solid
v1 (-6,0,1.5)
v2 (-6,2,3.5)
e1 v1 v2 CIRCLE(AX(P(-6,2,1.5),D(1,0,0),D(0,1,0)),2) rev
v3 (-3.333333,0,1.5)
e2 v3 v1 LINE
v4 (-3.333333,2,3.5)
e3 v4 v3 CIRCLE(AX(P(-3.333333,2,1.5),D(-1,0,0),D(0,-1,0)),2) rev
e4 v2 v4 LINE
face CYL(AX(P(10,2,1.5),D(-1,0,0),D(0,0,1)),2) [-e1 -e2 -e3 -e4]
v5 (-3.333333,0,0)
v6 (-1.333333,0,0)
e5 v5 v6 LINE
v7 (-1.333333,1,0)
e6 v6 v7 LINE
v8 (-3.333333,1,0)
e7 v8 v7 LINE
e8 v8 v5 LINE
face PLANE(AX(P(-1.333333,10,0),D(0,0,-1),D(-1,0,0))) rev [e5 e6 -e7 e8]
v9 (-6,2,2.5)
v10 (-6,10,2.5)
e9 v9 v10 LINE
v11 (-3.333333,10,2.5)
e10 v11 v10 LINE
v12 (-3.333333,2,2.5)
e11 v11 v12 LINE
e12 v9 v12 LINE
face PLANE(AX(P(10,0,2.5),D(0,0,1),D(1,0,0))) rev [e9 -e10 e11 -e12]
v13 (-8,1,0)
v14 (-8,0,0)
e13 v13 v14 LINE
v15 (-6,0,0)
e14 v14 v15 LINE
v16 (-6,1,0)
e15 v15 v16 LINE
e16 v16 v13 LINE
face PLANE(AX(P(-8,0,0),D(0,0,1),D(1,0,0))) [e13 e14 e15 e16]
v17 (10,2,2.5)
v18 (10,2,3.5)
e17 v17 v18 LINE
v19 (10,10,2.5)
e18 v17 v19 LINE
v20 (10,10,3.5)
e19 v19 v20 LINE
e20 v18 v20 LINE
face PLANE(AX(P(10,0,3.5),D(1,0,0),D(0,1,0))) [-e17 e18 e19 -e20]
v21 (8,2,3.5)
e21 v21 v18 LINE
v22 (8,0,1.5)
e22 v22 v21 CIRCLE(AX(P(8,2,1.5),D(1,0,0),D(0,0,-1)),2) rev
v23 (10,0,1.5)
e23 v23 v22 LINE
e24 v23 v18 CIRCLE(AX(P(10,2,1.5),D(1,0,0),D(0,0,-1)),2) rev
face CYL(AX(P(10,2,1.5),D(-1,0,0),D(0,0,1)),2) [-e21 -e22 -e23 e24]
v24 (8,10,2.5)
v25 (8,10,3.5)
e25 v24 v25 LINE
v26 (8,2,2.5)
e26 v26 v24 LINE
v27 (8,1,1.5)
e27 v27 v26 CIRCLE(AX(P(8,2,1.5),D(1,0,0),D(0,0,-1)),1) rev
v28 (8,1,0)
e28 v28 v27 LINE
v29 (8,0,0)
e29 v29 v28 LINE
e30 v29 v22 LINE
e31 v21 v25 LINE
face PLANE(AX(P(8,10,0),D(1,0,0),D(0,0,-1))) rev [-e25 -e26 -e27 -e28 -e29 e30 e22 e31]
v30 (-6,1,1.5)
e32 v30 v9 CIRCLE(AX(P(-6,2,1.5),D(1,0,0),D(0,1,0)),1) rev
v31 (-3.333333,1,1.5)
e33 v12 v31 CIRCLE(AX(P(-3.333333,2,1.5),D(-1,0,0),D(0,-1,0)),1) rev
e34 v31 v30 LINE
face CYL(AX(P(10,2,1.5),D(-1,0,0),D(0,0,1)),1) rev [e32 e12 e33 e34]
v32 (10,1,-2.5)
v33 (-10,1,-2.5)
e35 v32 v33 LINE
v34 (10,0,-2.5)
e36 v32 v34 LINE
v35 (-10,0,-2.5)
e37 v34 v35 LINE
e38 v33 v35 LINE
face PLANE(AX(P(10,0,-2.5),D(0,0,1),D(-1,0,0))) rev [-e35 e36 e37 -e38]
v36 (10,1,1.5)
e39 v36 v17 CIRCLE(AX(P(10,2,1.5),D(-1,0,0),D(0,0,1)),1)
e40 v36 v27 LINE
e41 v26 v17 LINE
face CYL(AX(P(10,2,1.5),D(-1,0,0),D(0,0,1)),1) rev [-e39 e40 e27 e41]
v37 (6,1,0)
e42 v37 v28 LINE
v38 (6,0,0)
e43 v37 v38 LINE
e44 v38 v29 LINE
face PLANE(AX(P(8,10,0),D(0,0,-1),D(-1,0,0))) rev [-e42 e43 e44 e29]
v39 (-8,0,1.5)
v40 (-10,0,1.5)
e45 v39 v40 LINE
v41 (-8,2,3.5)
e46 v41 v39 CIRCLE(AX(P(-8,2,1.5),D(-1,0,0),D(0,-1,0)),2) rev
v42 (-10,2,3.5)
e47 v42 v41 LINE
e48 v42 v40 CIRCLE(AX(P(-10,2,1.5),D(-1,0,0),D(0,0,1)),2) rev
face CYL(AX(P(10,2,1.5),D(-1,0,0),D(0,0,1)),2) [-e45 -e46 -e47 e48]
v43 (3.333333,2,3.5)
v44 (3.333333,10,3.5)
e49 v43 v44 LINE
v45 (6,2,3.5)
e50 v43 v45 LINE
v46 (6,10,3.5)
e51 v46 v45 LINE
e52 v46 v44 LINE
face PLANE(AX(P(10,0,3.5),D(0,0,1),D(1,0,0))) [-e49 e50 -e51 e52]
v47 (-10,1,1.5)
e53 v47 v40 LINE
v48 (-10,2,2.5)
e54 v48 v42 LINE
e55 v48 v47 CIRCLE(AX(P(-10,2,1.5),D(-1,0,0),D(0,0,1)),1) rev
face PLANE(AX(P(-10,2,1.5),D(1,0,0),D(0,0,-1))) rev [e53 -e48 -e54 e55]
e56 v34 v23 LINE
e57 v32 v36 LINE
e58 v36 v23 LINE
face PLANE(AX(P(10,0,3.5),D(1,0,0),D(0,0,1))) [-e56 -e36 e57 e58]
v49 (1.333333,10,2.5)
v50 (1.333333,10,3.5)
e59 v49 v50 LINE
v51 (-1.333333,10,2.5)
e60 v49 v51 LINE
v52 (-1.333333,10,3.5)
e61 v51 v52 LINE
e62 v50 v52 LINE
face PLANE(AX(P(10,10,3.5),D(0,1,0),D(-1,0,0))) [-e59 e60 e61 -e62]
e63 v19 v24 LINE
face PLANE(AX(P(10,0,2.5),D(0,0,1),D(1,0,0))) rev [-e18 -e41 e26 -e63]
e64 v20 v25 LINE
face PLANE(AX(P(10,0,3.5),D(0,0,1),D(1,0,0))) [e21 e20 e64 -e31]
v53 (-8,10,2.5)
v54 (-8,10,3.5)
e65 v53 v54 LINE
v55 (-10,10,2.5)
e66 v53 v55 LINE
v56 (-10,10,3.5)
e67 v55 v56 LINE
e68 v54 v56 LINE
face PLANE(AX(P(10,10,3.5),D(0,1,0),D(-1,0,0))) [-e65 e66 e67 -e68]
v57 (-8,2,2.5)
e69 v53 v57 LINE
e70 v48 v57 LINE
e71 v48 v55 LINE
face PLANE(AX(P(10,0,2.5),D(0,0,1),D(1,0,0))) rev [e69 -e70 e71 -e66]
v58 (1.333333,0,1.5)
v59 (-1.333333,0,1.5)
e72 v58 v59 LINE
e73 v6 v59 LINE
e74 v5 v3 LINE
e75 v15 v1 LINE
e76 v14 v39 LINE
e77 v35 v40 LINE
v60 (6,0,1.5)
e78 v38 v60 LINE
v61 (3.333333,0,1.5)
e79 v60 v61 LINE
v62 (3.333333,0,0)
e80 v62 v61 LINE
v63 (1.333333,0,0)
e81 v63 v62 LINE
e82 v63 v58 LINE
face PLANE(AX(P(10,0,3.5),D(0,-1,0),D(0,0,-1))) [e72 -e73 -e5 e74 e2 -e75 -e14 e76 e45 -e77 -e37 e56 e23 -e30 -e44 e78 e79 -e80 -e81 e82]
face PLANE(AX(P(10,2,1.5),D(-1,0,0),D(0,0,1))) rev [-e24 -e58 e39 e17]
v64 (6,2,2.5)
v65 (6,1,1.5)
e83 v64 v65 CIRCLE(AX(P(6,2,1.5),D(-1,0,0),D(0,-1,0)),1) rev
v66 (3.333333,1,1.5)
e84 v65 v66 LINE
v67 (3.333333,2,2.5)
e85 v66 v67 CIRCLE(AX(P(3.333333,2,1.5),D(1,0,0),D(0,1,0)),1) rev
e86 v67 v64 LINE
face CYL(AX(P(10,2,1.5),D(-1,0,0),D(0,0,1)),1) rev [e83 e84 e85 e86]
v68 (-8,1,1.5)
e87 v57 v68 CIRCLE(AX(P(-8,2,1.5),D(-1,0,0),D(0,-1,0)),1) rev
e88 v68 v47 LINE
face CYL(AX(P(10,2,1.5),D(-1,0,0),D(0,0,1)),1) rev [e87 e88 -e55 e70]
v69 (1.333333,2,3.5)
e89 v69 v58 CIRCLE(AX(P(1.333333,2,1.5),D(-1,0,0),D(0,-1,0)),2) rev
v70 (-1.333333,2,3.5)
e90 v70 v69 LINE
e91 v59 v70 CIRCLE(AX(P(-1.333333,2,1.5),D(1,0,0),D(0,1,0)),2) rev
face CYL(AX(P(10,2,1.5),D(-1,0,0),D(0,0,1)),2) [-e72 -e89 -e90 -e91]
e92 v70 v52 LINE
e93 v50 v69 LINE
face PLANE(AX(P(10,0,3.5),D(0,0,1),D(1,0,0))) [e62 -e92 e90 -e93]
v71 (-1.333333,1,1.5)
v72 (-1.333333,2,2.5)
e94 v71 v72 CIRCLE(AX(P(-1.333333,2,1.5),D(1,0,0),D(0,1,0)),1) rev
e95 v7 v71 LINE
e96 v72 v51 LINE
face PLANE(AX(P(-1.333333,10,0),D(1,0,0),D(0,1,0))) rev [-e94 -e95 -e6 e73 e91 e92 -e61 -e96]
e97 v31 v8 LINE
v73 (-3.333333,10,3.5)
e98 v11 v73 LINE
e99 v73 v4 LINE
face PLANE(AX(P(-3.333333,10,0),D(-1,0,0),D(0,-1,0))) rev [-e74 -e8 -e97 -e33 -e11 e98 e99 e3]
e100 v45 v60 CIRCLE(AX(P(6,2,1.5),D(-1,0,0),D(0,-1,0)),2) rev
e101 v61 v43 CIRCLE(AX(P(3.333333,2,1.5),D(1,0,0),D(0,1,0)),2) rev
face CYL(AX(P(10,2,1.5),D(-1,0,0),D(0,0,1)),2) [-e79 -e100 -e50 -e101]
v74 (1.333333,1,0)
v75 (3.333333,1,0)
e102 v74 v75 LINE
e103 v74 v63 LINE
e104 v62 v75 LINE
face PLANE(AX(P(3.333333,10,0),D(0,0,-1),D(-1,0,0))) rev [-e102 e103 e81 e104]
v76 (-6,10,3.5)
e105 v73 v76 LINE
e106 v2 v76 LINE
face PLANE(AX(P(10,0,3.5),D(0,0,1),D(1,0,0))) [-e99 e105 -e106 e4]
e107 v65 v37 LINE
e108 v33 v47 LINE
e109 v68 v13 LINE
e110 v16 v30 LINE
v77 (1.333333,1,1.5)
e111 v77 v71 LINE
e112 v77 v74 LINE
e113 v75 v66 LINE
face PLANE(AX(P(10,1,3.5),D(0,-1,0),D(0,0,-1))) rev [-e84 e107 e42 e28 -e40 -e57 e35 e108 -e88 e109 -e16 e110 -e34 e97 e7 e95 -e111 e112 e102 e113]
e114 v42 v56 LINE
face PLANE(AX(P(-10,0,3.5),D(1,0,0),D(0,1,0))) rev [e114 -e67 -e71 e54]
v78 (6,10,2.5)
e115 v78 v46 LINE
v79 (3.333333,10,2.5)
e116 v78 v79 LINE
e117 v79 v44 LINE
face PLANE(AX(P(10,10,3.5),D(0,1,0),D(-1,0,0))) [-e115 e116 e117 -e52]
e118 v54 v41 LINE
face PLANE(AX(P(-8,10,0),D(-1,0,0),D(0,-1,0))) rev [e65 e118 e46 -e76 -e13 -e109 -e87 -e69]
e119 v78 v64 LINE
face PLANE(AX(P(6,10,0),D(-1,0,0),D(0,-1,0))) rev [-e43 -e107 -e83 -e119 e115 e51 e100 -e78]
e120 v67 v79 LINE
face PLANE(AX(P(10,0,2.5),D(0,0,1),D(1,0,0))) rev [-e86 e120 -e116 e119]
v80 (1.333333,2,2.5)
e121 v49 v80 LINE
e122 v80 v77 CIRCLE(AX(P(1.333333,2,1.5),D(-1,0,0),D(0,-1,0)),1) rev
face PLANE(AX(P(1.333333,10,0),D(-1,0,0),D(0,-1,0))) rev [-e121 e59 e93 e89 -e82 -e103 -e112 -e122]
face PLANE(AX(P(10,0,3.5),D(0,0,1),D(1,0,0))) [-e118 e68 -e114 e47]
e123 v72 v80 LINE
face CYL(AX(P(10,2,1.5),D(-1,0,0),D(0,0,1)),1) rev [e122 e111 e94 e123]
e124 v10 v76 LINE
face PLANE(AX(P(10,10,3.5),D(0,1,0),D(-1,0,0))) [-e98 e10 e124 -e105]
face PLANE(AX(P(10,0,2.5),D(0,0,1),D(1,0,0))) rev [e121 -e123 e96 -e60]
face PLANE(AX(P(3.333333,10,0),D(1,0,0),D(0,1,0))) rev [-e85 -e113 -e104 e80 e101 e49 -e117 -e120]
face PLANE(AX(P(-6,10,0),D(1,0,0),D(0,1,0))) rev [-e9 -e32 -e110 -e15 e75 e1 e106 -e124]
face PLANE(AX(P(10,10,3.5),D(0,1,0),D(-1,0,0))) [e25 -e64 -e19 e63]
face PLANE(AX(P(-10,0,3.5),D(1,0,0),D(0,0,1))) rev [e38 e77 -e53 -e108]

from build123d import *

# Parameters (mm, degrees)
VYSUNOUT_TENKOST_NN_1_DEPTH = 10
P_EV_ST_OBJEM1_START        = -10
P_EV_ST_OBJEM1_DEPTH        = 20
P_EV_ST_OBJEM1_2_DEPTH      = 20
SKICA10_W                   = 2
SKICA10_H                   = 10
ODEBRAT_VYSUNUT_M3_DEPTH    = 3.5


# Read off the part's stored shape, not the designer's step: Převést-Objem1
with BuildPart() as part:
    # Skica1 → Vysunout tenkostěnný1 (new, symmetric)
    with BuildSketch(Plane(origin=(0, 0, 0), x_dir=(0, 0, -1), z_dir=(1, 0, 0))):
        Polygon((-3.5, 10), (-3.5, 0), (2.5, 0), (2.5, 1), (-2.5, 1), (-2.5, 10), align=None)
    extrude(amount=VYSUNOUT_TENKOST_NN_1_DEPTH, both=True)

    # Převést-Objem1 outline → Převést-Objem1 (cut)
    with BuildSketch(Plane.YZ.offset(P_EV_ST_OBJEM1_START)):
        with BuildLine():
            Line((0, 3.5), (0, 1.5))
            ThreePointArc((0, 1.5), (0.585786438, 2.914213562), (2, 3.5))
            Line((2, 3.5), (0, 3.5))
        make_face()
    extrude(amount=P_EV_ST_OBJEM1_DEPTH, mode=Mode.SUBTRACT)

    # P_ev_st-Objem1 2 outline → P_ev_st-Objem1 2 (add)
    with BuildSketch(Plane.YZ.offset(P_EV_ST_OBJEM1_START)):
        with BuildLine():
            Line((1, 2.5), (1, 1.5))
            ThreePointArc((1, 1.5), (1.292893219, 2.207106781), (2, 2.5))
            Line((2, 2.5), (1, 2.5))
        make_face()
    extrude(amount=P_EV_ST_OBJEM1_2_DEPTH)

    # Skica10 → Odebrat vysunutím3 (cut)
    with BuildSketch(Plane.XY.offset(3.5)):
        with Locations((-7, 5)):
            Rectangle(SKICA10_W, SKICA10_H)
        with Locations((-2.333333333, 5)):
            Rectangle(SKICA10_W, SKICA10_H)
        with Locations((2.333333333, 5)):
            Rectangle(SKICA10_W, SKICA10_H)
        with Locations((7, 5)):
            Rectangle(SKICA10_W, SKICA10_H)
    extrude(amount=-ODEBRAT_VYSUNUT_M3_DEPTH, mode=Mode.SUBTRACT)


solid = part.part
